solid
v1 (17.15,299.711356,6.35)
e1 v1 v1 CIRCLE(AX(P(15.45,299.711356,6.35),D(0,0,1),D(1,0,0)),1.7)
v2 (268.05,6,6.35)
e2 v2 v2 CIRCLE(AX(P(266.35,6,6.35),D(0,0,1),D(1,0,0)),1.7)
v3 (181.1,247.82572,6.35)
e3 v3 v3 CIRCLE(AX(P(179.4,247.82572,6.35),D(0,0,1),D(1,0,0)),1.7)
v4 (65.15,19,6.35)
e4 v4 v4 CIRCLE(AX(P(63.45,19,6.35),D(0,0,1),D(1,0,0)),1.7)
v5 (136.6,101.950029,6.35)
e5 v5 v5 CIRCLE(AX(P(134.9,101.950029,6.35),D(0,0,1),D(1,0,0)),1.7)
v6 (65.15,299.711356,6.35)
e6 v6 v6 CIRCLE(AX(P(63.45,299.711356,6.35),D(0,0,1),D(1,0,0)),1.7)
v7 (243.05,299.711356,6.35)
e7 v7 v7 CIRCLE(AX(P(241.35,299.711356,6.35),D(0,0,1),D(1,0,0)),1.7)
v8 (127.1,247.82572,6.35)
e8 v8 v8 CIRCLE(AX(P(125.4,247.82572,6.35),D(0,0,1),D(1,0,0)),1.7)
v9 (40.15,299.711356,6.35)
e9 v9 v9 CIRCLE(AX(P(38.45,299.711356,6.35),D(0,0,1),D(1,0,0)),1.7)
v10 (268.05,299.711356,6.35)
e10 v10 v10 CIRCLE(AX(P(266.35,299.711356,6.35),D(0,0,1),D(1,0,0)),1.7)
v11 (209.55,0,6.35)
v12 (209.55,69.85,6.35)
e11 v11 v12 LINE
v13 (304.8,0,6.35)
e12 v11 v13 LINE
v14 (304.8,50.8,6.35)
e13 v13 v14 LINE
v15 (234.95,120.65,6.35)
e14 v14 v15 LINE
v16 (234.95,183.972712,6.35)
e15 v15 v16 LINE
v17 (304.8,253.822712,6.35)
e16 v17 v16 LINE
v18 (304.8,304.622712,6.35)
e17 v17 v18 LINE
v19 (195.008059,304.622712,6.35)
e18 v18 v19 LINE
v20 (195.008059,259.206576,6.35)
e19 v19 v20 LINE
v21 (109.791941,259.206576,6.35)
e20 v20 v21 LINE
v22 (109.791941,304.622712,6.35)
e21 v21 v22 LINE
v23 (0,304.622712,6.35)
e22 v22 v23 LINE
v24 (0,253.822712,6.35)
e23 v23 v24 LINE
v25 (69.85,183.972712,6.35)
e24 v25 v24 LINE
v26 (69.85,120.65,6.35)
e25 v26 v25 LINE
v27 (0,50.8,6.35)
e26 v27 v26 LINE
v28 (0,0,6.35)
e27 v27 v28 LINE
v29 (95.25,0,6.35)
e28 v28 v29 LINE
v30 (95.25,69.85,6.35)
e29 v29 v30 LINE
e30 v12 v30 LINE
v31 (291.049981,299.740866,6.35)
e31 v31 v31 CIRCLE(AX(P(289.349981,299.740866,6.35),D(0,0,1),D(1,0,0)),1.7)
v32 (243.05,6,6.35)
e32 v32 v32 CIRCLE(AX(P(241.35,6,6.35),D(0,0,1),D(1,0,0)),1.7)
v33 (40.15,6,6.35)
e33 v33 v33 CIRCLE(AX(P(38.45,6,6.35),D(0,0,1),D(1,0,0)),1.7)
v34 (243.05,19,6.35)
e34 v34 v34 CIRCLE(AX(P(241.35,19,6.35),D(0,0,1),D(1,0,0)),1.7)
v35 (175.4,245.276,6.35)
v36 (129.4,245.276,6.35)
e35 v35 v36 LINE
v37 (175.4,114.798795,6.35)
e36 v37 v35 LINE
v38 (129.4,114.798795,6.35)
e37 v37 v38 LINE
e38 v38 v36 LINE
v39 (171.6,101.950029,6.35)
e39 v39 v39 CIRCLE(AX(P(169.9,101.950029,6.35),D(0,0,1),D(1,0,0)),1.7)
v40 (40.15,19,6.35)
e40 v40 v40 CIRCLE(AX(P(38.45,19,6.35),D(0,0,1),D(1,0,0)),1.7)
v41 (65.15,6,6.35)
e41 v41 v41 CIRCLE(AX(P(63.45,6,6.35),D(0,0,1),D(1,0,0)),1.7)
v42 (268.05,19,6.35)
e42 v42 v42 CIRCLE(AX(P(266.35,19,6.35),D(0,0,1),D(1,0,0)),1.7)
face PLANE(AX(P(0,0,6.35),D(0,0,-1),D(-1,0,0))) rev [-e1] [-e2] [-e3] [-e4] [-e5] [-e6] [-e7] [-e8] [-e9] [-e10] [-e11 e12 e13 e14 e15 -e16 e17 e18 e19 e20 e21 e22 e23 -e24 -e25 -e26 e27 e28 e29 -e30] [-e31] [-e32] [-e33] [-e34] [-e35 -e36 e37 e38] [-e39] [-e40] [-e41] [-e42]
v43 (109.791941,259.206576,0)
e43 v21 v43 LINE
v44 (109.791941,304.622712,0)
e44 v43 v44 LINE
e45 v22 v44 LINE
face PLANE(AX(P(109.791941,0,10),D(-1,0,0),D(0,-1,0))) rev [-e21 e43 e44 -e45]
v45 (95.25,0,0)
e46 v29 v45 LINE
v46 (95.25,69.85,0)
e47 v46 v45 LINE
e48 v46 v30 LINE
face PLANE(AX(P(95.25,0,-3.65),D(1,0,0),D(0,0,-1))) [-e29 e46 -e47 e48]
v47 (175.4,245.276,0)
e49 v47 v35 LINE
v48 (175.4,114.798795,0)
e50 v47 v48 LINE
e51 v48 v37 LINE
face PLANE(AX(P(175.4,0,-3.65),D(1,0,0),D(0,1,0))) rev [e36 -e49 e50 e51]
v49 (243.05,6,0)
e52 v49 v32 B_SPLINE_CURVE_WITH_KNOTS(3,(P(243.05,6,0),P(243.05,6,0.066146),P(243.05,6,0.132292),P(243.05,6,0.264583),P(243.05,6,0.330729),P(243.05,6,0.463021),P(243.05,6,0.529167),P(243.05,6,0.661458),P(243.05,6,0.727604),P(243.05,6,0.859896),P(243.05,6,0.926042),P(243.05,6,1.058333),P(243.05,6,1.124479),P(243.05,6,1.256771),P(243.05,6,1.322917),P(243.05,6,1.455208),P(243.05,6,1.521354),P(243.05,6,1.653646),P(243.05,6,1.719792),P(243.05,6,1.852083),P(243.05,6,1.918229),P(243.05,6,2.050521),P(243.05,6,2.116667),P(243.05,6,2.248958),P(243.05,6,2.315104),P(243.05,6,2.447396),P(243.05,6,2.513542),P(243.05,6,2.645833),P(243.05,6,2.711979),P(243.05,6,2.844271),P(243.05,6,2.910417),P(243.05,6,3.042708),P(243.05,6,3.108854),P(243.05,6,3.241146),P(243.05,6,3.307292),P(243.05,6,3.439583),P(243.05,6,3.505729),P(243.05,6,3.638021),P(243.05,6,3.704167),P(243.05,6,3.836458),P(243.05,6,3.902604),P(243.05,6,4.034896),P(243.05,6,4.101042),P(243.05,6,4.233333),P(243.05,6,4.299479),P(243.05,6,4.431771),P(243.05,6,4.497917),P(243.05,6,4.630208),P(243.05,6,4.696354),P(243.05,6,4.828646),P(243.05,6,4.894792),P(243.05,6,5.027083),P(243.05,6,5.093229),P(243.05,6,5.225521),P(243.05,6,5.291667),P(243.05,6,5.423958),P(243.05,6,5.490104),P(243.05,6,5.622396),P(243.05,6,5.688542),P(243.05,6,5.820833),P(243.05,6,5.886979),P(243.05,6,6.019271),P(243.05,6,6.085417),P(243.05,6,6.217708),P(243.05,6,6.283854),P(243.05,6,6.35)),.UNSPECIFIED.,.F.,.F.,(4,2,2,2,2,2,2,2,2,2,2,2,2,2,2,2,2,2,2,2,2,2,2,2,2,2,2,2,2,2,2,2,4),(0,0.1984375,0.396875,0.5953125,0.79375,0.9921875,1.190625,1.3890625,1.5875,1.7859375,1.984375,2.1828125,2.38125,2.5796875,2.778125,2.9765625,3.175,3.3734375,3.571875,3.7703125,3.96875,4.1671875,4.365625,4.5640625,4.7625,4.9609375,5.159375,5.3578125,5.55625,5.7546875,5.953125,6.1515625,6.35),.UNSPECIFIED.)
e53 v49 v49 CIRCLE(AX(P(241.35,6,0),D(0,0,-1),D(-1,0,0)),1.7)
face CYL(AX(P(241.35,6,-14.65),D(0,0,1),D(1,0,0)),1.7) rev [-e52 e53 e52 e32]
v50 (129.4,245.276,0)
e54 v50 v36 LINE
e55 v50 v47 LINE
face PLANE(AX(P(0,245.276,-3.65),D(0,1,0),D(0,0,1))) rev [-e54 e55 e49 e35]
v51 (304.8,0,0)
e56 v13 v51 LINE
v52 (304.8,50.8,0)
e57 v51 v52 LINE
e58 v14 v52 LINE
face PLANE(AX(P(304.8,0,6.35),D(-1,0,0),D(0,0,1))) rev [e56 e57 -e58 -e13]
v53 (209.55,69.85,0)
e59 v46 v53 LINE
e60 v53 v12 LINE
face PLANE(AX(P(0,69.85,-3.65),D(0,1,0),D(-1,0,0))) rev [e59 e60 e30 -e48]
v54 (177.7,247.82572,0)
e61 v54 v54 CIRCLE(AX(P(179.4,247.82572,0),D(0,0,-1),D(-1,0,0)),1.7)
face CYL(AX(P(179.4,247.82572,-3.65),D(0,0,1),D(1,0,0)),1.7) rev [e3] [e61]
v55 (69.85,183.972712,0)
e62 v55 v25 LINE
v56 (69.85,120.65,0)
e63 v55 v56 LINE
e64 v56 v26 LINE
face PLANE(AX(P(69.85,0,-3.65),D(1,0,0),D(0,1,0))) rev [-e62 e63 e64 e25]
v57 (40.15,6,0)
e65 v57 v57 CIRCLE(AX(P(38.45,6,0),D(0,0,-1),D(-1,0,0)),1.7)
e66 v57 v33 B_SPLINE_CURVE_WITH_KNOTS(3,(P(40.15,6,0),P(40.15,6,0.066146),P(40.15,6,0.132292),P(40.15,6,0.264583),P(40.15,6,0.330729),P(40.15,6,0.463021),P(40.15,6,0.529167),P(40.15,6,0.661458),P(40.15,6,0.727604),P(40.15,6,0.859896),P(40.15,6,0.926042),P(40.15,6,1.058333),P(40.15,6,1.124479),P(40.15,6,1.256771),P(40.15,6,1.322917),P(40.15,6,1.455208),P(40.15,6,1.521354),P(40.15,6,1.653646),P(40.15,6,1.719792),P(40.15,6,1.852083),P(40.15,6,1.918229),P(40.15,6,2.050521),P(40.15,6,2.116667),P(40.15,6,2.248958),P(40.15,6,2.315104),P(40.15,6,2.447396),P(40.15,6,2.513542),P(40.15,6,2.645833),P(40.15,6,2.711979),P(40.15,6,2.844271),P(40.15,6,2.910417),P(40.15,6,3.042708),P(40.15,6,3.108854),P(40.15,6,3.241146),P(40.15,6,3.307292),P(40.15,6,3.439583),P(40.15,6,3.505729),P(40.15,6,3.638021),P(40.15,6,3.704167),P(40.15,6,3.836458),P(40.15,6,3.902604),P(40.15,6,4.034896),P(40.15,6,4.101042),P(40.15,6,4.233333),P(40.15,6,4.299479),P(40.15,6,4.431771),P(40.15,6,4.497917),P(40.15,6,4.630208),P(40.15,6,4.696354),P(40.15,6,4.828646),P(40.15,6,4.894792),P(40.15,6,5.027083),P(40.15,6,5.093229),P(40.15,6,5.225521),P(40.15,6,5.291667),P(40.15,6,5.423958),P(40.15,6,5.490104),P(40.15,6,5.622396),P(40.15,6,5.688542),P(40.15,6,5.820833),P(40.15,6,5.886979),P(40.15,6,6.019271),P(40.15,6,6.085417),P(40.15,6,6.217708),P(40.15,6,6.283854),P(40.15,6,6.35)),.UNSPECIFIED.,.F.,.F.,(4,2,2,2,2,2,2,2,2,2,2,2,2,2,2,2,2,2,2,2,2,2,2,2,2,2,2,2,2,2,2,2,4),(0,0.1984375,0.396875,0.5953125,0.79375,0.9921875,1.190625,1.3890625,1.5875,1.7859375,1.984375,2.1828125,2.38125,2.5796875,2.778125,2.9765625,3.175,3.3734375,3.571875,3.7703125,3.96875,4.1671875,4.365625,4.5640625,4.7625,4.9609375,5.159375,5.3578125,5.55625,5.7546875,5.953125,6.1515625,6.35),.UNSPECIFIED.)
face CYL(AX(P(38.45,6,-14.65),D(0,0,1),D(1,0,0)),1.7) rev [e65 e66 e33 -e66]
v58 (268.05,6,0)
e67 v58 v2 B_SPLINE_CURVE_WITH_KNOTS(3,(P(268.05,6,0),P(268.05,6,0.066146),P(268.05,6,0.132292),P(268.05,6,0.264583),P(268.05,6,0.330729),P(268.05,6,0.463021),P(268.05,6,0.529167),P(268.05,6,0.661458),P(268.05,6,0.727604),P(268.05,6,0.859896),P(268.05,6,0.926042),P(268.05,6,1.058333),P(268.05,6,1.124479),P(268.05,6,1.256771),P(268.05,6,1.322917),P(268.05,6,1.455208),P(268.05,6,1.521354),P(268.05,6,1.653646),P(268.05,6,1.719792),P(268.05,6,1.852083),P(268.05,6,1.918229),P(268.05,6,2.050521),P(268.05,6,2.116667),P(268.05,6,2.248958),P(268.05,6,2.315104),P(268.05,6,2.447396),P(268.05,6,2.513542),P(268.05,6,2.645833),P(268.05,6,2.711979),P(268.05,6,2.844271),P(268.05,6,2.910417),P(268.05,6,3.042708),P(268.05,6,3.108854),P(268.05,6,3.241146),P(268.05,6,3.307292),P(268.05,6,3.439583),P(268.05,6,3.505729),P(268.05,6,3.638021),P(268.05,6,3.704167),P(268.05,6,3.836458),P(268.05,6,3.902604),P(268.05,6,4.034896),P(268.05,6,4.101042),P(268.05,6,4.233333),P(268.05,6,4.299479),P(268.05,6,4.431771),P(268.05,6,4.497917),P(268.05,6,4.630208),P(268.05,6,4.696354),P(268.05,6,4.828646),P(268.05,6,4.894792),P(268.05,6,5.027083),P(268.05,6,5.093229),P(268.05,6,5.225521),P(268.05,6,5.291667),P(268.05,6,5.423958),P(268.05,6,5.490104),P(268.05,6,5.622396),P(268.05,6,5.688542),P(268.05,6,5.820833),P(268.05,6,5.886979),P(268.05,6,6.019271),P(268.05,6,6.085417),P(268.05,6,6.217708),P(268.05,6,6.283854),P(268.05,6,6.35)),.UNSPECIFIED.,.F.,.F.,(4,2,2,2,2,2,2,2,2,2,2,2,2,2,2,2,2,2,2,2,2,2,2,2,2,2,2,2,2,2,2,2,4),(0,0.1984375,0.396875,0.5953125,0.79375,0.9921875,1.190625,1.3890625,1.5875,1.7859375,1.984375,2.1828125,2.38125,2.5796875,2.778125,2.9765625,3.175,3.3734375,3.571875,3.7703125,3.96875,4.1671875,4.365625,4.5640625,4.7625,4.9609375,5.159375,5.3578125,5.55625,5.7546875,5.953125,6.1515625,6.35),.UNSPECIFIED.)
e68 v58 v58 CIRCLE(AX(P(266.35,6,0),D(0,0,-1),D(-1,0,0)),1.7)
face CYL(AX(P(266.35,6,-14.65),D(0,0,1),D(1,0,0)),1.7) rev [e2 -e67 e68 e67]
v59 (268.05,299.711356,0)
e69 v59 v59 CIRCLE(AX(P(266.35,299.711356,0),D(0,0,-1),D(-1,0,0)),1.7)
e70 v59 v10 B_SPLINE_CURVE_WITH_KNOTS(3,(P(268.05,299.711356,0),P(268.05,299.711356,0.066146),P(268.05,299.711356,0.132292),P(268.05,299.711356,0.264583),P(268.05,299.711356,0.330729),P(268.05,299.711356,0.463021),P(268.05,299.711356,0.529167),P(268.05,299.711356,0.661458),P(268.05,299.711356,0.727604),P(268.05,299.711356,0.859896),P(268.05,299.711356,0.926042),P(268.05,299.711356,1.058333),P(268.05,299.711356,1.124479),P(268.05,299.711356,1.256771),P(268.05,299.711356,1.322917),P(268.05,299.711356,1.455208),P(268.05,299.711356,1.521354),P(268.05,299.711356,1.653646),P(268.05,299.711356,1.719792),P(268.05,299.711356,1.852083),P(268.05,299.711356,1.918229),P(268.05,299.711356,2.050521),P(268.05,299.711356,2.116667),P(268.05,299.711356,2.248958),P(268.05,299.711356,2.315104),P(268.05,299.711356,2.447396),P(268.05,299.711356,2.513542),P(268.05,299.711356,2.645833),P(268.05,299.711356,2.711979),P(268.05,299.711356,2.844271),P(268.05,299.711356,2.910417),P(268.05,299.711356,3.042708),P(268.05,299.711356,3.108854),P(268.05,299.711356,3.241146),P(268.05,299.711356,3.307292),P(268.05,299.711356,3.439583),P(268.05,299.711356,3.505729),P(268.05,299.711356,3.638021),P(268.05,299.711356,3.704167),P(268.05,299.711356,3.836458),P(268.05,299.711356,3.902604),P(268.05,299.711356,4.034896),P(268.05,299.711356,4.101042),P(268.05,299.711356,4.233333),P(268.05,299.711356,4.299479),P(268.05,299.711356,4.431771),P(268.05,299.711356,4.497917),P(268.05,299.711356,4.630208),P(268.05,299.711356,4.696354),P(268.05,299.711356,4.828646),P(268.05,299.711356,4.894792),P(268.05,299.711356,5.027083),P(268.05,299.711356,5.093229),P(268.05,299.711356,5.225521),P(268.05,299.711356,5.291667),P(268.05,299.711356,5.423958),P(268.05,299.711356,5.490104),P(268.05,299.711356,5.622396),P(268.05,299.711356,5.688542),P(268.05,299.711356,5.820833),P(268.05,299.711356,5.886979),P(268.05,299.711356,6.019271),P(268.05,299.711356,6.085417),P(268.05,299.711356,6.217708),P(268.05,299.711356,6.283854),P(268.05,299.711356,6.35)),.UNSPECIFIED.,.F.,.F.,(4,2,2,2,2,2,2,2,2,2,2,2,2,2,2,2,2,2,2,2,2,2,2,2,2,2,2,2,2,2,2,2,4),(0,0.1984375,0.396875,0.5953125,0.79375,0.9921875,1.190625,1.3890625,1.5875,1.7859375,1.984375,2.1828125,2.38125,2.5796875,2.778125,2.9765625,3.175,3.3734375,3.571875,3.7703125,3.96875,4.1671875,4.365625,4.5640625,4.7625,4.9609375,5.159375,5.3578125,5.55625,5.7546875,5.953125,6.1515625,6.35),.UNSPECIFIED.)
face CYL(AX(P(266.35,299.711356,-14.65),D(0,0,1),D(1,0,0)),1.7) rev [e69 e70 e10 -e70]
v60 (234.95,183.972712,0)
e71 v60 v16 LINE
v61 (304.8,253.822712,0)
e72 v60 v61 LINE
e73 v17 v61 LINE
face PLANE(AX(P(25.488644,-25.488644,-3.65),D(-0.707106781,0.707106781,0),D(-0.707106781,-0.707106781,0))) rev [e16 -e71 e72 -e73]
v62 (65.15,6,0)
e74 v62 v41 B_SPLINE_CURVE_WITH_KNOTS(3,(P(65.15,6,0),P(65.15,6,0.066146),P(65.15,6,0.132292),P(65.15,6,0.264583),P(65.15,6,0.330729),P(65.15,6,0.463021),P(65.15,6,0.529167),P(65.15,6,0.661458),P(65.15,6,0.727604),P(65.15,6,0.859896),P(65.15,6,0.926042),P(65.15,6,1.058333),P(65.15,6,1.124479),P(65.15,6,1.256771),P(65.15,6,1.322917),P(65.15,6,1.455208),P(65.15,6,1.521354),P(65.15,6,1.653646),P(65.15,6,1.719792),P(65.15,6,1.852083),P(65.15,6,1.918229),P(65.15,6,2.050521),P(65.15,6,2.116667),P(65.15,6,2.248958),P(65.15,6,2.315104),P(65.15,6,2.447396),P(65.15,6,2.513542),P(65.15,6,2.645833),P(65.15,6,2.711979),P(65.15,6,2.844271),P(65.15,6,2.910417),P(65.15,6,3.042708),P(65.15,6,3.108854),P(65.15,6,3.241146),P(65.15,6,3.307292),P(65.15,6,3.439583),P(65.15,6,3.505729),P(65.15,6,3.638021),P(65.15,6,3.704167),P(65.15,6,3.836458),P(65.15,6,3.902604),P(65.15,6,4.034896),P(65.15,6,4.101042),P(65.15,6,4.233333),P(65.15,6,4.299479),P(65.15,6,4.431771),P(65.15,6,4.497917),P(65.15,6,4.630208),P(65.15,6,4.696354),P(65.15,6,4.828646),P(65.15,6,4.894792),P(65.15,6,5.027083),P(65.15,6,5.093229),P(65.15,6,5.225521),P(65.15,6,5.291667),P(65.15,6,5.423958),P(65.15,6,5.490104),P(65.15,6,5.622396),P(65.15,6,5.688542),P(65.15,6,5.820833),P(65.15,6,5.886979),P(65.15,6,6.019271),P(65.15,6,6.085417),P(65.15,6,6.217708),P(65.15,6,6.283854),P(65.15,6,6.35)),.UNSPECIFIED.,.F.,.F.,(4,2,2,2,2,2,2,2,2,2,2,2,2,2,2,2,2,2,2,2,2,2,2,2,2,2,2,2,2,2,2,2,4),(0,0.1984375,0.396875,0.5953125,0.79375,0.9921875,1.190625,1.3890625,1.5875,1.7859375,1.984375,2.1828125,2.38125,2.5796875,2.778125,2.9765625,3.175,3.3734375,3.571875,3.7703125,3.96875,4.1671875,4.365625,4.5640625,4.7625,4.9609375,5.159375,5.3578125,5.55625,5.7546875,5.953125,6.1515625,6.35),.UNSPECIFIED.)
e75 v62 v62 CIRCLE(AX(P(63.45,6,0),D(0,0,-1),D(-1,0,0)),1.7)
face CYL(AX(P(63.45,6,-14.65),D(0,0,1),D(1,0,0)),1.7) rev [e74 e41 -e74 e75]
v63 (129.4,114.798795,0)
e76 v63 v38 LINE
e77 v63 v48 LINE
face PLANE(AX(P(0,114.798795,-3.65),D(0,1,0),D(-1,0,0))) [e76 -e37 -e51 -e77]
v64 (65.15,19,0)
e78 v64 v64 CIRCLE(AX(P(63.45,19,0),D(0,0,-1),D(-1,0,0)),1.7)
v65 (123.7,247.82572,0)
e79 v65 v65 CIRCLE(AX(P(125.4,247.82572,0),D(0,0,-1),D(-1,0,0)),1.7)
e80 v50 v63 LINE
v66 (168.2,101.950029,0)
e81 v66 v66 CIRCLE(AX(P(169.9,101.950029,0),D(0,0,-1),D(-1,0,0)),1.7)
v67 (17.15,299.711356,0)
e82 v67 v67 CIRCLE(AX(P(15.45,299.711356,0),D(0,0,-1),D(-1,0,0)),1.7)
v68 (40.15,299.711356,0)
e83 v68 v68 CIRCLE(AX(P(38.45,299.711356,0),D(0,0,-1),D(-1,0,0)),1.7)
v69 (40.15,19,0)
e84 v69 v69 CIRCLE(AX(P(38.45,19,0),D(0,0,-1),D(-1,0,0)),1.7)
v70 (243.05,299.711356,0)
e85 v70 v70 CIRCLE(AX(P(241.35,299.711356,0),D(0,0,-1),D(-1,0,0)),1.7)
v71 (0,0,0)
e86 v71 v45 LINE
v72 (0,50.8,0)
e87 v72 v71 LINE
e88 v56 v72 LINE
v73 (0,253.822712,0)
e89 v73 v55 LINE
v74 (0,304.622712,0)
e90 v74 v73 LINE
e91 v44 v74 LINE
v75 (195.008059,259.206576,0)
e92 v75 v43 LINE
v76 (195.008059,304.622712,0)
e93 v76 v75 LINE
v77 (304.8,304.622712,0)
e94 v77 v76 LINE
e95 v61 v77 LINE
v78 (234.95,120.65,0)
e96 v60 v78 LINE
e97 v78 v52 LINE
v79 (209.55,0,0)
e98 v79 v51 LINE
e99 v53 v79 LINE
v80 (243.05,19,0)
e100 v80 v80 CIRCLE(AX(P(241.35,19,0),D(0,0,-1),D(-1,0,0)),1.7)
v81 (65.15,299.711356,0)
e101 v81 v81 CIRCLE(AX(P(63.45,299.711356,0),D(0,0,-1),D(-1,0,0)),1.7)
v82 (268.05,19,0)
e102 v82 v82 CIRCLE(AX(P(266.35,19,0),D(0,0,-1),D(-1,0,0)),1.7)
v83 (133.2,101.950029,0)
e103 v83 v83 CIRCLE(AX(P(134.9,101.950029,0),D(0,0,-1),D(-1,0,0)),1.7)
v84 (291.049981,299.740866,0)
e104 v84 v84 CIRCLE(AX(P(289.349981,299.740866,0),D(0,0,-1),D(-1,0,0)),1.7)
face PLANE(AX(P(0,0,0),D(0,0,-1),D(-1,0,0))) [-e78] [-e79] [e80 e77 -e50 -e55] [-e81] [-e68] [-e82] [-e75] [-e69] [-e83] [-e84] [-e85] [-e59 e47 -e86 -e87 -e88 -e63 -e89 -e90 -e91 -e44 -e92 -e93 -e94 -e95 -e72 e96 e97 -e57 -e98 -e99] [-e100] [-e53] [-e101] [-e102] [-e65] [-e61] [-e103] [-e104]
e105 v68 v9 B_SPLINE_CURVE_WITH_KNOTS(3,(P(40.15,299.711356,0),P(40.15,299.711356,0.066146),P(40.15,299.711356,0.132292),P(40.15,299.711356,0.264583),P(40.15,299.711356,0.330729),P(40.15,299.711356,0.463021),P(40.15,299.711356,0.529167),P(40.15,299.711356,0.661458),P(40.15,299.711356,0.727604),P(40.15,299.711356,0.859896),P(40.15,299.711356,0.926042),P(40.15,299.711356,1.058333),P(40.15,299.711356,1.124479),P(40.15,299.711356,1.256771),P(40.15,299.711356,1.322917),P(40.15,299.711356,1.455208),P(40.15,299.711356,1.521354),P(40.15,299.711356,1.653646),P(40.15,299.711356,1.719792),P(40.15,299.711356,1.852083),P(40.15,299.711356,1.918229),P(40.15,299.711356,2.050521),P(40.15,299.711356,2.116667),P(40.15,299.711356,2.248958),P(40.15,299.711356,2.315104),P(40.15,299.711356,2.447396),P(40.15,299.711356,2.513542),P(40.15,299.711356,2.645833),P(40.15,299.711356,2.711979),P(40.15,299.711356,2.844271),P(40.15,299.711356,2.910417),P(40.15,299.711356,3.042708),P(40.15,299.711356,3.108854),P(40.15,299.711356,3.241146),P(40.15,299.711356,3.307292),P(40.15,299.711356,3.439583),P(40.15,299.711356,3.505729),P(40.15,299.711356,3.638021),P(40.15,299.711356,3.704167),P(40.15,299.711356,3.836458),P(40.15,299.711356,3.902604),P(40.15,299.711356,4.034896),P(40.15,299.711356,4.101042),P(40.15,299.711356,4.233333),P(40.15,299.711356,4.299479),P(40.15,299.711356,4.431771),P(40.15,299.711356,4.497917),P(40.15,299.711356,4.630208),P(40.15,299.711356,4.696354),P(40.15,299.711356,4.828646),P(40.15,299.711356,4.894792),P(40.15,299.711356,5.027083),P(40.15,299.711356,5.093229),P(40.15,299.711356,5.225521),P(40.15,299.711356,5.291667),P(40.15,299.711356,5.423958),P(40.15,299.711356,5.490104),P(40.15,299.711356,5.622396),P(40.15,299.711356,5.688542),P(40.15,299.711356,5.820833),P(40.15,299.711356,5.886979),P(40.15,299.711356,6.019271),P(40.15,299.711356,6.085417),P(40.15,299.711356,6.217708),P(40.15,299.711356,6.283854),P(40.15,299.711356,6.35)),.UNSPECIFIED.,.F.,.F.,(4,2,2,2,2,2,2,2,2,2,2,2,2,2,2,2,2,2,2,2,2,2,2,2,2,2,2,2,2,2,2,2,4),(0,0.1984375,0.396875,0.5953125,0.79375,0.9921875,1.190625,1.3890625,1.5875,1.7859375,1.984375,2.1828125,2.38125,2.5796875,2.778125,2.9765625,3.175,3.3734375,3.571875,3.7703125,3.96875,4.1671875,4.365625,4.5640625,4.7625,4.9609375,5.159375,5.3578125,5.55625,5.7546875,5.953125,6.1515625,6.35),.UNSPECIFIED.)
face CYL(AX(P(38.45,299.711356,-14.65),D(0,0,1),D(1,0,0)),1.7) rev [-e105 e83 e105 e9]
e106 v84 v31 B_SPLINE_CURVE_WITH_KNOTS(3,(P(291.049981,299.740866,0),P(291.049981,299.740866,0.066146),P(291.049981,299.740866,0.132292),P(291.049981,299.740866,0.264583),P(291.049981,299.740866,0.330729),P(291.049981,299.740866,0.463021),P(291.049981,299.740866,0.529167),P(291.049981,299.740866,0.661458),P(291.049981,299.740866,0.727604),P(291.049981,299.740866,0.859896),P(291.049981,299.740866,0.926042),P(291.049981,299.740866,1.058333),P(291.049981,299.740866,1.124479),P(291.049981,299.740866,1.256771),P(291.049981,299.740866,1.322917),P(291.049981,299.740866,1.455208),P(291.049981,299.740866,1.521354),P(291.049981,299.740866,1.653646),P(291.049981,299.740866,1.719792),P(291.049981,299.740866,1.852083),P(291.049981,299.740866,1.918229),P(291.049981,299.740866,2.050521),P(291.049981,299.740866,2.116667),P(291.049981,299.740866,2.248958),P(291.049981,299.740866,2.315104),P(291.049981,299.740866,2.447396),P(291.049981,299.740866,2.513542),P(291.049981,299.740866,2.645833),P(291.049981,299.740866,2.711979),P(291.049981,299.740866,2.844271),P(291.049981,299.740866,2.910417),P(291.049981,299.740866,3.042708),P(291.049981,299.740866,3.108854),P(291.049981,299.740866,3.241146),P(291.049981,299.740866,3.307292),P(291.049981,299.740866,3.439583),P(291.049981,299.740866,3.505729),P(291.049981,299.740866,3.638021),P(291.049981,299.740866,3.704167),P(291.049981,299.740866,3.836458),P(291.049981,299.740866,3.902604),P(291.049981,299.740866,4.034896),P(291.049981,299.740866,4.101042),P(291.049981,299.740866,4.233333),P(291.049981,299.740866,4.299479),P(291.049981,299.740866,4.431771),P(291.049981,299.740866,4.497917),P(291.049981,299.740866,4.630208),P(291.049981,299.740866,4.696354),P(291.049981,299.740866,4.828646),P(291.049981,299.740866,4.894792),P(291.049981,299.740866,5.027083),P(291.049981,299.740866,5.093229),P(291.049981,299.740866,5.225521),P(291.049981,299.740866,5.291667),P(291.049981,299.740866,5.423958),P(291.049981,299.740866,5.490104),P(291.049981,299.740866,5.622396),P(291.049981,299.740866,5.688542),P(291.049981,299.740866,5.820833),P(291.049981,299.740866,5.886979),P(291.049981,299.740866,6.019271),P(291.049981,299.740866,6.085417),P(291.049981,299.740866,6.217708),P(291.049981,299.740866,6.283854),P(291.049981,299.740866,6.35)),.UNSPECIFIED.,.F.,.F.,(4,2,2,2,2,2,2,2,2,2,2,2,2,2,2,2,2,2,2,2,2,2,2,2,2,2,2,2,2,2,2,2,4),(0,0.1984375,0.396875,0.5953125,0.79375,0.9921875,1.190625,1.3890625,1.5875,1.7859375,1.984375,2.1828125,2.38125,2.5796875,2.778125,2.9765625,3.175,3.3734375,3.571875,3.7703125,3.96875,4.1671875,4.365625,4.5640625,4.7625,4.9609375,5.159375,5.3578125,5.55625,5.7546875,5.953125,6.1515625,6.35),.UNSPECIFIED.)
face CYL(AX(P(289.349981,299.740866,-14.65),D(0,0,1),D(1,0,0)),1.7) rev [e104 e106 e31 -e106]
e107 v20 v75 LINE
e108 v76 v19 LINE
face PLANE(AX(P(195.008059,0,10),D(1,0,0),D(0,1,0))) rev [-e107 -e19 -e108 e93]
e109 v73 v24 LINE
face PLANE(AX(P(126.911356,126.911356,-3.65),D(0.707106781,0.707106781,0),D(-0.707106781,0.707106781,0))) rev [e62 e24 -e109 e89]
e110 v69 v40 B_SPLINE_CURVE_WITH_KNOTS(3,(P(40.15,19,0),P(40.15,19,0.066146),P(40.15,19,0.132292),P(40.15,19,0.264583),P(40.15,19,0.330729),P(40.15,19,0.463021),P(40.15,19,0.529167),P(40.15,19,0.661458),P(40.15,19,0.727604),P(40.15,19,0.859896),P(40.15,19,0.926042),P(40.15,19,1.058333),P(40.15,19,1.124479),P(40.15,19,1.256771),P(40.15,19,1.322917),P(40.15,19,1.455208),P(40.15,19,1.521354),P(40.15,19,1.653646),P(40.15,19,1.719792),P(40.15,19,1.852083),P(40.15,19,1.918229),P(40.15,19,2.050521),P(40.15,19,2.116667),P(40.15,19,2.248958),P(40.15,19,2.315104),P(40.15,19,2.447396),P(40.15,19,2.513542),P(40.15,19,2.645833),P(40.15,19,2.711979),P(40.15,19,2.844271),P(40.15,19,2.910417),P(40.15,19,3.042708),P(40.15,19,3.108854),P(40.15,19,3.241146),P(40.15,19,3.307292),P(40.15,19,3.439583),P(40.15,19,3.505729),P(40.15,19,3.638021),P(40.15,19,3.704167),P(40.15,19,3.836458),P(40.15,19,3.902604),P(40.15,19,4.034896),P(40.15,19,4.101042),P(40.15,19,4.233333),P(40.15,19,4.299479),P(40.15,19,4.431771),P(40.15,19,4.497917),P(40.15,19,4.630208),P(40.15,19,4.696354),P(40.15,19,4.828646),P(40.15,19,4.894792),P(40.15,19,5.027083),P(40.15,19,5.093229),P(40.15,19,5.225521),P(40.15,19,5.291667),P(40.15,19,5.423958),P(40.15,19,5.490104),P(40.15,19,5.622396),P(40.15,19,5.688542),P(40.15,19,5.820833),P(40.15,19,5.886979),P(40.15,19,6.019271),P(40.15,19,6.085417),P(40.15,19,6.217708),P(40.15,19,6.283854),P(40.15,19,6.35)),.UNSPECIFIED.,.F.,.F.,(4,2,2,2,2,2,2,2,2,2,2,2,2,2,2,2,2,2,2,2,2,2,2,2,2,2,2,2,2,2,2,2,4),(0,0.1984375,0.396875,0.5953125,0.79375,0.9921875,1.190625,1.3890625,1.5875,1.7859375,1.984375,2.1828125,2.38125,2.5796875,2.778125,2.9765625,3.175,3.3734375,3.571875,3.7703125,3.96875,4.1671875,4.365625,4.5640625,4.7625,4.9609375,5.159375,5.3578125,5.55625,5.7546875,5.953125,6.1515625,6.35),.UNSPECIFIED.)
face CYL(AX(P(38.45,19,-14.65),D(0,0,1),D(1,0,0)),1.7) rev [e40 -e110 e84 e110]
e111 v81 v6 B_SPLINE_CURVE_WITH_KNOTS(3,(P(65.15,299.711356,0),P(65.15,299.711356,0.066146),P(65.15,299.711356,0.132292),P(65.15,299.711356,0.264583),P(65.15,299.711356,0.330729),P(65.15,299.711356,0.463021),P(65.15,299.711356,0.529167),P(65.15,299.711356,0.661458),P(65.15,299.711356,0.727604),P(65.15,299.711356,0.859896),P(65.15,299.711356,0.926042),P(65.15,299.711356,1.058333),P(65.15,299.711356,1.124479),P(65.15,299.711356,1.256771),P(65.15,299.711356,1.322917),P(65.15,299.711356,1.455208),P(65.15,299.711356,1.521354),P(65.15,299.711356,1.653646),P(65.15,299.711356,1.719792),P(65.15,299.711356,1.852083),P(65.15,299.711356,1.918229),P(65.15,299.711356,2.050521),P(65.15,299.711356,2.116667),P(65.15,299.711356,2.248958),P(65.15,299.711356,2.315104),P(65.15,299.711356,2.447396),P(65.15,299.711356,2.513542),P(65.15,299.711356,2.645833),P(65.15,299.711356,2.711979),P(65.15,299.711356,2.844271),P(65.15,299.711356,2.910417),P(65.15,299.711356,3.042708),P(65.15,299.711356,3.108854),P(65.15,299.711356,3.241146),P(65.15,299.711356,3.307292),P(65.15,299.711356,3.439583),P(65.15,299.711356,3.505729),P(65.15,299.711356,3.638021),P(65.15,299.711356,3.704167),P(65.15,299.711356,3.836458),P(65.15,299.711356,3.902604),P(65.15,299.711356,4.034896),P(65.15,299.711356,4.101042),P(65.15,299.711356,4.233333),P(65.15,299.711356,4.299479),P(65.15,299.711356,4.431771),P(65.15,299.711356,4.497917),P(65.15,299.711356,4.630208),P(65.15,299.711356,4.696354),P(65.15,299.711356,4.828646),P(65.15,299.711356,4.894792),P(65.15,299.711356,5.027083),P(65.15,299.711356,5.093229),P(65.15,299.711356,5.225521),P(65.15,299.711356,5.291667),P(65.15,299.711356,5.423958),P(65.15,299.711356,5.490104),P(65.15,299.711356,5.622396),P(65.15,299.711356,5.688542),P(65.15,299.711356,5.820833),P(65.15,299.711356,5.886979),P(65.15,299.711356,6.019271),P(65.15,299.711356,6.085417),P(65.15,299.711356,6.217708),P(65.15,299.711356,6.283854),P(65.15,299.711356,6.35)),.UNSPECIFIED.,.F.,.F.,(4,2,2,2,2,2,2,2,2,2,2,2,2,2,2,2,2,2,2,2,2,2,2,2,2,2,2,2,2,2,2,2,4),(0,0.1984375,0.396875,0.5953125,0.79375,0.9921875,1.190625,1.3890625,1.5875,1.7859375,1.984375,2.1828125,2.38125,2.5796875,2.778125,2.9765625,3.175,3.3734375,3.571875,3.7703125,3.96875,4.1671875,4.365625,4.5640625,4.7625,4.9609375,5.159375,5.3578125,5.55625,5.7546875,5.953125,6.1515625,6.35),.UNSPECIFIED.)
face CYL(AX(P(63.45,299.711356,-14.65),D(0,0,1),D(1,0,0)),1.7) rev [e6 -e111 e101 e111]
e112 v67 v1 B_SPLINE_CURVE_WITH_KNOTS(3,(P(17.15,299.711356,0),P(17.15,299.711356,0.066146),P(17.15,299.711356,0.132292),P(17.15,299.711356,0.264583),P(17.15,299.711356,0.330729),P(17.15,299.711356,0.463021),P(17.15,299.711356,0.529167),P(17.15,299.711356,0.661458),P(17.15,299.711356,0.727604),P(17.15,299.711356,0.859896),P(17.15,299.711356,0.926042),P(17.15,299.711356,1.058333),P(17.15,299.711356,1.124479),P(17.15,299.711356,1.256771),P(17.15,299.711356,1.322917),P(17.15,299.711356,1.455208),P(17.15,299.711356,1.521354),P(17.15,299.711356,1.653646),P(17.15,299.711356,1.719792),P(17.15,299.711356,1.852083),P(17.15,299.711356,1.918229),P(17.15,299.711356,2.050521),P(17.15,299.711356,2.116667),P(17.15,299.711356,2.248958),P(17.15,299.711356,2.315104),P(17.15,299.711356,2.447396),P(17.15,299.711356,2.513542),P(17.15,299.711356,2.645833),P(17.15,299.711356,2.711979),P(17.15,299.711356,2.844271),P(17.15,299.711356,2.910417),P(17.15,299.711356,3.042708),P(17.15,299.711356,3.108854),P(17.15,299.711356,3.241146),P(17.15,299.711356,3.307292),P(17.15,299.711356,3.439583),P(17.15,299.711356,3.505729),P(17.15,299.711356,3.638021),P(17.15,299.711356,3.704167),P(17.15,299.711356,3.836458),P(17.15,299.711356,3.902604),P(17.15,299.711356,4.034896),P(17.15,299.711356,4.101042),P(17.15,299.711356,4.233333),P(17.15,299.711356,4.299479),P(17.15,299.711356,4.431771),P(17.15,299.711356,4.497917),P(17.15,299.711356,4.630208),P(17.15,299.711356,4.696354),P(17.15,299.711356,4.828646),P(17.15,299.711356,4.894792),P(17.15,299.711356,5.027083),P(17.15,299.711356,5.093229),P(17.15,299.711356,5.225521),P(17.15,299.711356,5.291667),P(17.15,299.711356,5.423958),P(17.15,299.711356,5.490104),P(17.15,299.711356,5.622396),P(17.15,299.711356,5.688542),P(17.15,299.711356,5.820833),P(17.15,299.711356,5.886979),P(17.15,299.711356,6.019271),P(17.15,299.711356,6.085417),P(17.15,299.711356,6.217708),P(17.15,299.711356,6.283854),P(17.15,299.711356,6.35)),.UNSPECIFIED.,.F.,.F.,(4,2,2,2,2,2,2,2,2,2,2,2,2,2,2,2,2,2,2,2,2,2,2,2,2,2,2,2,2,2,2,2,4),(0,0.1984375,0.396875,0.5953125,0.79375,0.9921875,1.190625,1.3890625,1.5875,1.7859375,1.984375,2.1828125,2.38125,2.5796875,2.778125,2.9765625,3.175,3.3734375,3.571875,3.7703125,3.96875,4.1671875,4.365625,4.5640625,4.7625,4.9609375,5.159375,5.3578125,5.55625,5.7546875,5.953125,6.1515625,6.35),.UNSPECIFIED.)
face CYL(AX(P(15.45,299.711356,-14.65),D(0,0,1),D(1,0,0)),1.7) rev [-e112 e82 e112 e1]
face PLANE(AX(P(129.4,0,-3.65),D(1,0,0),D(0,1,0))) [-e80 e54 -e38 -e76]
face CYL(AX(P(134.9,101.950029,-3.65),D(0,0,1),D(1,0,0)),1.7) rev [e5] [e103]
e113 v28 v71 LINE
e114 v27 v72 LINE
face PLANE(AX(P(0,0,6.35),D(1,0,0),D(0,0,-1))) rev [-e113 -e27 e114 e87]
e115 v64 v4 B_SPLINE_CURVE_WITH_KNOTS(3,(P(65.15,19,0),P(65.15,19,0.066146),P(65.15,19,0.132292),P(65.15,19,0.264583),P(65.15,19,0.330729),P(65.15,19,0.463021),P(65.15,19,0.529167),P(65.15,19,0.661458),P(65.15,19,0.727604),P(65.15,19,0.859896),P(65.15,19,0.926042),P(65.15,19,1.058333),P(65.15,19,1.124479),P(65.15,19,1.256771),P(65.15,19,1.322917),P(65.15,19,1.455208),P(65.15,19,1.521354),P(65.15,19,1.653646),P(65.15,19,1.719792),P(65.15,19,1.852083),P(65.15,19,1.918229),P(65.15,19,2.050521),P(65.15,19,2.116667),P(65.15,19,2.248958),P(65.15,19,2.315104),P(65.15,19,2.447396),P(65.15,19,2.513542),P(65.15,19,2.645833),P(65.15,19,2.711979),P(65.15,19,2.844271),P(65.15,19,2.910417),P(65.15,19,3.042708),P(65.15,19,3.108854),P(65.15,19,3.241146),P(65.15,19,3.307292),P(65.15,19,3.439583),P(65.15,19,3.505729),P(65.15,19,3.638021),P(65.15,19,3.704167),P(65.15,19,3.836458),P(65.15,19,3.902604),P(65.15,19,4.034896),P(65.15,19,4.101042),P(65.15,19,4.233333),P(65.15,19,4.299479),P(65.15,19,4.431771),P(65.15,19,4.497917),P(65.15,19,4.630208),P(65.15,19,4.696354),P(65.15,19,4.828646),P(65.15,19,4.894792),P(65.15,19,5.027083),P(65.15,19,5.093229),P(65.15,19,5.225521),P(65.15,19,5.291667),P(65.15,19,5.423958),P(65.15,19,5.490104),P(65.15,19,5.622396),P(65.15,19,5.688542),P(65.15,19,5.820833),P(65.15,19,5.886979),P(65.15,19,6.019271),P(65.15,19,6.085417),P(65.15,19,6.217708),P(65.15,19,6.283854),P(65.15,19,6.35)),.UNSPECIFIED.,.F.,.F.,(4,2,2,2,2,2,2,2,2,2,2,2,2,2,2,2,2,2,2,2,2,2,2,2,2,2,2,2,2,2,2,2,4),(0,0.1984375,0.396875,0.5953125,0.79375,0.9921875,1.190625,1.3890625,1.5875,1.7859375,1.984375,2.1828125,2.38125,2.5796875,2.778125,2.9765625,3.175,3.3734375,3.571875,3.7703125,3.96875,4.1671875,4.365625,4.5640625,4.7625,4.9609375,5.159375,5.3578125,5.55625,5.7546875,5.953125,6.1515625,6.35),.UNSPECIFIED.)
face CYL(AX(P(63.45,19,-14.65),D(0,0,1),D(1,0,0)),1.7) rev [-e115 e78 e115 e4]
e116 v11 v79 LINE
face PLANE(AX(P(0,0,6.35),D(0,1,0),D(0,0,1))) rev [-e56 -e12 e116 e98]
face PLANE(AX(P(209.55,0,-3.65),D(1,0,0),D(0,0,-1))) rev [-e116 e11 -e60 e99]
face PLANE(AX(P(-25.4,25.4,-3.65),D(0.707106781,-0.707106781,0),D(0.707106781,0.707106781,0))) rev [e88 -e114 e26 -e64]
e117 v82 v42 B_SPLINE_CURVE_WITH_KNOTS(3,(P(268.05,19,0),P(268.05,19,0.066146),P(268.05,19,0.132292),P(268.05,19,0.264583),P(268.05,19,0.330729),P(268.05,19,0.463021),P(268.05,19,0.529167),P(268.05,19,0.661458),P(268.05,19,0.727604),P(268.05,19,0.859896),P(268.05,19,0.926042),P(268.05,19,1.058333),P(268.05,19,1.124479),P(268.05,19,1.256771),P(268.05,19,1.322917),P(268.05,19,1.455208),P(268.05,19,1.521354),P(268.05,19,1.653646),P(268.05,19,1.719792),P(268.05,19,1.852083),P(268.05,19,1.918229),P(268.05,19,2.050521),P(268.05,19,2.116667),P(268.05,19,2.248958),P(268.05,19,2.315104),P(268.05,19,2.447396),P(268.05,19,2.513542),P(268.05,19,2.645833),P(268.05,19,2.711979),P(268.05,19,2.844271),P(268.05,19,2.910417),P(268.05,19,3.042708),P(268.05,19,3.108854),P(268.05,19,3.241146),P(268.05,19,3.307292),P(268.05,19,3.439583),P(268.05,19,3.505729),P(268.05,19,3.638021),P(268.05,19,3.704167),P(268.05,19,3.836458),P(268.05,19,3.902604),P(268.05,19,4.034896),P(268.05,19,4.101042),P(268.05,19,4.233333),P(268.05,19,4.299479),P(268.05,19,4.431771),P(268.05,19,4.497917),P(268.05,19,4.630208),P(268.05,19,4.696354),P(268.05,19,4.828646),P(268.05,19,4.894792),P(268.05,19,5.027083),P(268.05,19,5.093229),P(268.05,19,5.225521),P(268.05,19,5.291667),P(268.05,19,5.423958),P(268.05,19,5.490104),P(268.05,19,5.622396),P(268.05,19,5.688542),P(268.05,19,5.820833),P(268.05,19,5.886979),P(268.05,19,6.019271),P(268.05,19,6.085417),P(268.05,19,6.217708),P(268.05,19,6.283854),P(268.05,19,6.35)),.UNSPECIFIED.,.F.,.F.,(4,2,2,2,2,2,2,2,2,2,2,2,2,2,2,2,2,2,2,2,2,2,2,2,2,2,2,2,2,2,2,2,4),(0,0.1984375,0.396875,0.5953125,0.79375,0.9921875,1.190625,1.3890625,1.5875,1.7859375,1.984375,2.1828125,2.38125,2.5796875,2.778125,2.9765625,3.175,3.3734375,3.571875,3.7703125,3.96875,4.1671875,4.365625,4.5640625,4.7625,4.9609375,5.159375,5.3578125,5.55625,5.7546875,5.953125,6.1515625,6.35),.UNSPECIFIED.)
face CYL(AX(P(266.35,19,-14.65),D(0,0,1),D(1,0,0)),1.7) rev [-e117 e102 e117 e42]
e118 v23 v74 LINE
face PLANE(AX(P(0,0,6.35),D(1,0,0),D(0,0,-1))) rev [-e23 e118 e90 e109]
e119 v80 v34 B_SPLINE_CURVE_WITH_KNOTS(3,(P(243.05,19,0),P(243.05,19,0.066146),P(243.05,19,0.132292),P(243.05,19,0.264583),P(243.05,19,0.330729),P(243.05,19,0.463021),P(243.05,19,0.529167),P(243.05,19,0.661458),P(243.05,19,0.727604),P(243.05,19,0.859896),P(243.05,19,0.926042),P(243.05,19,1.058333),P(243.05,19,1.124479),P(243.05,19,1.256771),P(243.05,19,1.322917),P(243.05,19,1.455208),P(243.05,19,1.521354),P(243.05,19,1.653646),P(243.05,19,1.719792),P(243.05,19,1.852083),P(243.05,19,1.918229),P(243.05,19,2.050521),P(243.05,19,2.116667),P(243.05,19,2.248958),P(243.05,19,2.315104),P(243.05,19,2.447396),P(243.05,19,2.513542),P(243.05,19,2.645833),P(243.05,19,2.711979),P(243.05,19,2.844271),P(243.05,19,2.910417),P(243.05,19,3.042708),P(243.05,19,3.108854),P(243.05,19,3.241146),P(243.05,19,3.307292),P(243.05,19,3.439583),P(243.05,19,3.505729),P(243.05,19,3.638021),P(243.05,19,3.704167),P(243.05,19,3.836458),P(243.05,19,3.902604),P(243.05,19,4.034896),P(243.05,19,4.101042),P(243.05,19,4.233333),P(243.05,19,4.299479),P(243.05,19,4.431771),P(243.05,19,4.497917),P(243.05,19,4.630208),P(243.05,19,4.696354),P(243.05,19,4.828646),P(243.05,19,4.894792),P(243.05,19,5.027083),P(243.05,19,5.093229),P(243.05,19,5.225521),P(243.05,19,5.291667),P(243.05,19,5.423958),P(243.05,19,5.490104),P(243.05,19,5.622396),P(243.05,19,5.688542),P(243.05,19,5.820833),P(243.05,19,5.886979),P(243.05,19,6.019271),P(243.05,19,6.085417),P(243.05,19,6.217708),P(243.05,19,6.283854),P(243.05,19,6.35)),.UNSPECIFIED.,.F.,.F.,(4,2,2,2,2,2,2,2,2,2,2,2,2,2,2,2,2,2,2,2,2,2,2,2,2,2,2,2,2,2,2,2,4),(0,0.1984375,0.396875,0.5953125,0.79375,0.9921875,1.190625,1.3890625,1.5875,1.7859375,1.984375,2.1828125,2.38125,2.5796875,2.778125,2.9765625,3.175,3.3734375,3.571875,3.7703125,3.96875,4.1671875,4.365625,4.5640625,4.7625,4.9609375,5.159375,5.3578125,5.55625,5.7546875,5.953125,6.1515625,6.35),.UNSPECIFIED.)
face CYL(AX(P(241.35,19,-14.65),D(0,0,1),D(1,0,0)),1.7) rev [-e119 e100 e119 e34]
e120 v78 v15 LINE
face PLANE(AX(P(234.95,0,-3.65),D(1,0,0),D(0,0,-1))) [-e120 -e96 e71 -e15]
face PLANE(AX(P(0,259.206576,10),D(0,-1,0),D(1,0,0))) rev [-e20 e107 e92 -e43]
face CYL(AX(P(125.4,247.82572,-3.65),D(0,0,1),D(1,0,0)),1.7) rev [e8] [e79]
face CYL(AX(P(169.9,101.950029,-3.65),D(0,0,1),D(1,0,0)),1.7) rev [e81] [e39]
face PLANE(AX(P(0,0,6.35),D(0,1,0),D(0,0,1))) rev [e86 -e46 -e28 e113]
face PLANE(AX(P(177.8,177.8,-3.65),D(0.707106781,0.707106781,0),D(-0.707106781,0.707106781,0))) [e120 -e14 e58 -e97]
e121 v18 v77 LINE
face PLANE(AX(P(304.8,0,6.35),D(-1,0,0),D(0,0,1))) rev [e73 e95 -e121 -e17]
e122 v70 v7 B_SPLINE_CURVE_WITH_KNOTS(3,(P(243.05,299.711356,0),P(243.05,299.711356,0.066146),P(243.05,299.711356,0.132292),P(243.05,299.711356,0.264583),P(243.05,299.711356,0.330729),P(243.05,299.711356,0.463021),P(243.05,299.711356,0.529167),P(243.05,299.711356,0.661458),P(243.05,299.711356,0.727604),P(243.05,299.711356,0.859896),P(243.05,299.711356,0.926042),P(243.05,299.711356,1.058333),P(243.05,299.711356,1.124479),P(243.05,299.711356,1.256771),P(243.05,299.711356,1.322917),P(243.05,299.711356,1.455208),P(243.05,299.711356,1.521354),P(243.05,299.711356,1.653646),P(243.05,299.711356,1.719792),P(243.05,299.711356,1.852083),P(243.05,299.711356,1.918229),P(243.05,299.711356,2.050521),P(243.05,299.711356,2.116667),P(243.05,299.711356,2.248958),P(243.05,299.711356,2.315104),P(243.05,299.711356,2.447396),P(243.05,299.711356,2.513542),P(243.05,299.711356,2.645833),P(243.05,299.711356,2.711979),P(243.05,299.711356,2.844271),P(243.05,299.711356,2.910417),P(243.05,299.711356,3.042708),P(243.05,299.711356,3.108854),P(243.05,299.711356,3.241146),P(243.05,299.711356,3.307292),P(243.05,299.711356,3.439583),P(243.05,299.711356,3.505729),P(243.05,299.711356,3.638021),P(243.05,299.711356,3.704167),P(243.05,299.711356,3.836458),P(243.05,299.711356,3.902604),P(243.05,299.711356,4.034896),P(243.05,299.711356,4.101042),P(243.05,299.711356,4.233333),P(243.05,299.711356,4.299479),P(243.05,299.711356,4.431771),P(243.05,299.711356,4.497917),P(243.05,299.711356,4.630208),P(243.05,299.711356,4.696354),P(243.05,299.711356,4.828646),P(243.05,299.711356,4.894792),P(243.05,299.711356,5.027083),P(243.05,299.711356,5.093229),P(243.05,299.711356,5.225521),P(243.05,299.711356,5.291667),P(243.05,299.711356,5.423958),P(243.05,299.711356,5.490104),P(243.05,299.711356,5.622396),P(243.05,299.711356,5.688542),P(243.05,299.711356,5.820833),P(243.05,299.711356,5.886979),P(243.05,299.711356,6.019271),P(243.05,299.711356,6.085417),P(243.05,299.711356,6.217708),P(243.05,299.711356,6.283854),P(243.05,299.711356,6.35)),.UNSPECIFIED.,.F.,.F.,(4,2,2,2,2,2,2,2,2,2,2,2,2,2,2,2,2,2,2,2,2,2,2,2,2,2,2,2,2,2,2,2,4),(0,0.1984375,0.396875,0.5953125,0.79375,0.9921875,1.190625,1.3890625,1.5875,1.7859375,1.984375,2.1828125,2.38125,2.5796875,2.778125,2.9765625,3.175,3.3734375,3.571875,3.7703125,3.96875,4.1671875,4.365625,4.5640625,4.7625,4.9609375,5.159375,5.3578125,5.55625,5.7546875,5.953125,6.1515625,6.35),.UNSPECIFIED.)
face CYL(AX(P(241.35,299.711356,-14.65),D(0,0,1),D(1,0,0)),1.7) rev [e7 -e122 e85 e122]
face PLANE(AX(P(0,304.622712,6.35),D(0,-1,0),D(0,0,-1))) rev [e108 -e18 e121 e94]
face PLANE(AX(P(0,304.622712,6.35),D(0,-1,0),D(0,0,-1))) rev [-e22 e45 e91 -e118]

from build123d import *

# Parameters (mm, degrees)
SKETCH1_W              = 304.8
SKETCH1_H              = 304.622712027
BOSS_EXTRUDE1_DEPTH    = 6.35
CUT_EXTRUDE1_START     = -6.35
CUT_EXTRUDE1_OUTLINE_R = 1.7
CUT_EXTRUDE1_OUTLINE_W = 46
CUT_EXTRUDE1_OUTLINE_H = 130.477204634
CUT_EXTRUDE1_DEPTH     = 6.35
SKETCH4_W              = 85.216118386
SKETCH4_H              = 49.623018197
CUT_EXTRUDE2_DEPTH     = 10
SKETCH5_R              = 1.7
CUT_EXTRUDE3_DEPTH     = 21
SKETCH6_R              = 1.7
CUT_EXTRUDE4_DEPTH     = 21
SKETCH7_W              = 114.3
SKETCH7_H              = 69.85
CUT_EXTRUDE5_DEPTH     = 10


# Read off the part's stored shape, not the designer's step: Cut-Extrude1
with BuildPart() as part:
    # Sketch1 → Boss-Extrude1 (new body)
    with BuildSketch(Plane.XY):
        with Locations((152.4, 152.311356014)):
            Rectangle(SKETCH1_W, SKETCH1_H)
    extrude(amount=BOSS_EXTRUDE1_DEPTH)

    # Cut-Extrude1 outline → Cut-Extrude1 (cut)
    with BuildSketch(Plane.XY.offset(6.35).offset(CUT_EXTRUDE1_START)):
        with Locations((169.9, 101.950028876)):
            Circle(CUT_EXTRUDE1_OUTLINE_R)
        with Locations((152.4, 180.037397769)):
            Rectangle(CUT_EXTRUDE1_OUTLINE_W, CUT_EXTRUDE1_OUTLINE_H)
        with Locations((125.4, 247.82572008)):
            Circle(CUT_EXTRUDE1_OUTLINE_R)
        with Locations((179.4, 247.82572008)):
            Circle(CUT_EXTRUDE1_OUTLINE_R)
        with Locations((134.9, 101.950028876)):
            Circle(CUT_EXTRUDE1_OUTLINE_R)
    extrude(amount=CUT_EXTRUDE1_DEPTH, mode=Mode.SUBTRACT)

    # Sketch4 → Cut-Extrude2 (cut)
    with BuildSketch(Plane(origin=(0, 0, 0), x_dir=(-1, 0, 0), z_dir=(0, 0, -1))):
        with Locations((-152.4, 284.018084638)):
            Rectangle(SKETCH4_W, SKETCH4_H)
    extrude(amount=-CUT_EXTRUDE2_DEPTH, mode=Mode.SUBTRACT)

    # Sketch5 → Cut-Extrude3 (cut)
    with BuildSketch(Plane.XY.offset(6.35)):
        with Locations((241.35, 299.711356013)):
            Circle(SKETCH5_R)
        with Locations((266.35, 299.711356013)):
            Circle(SKETCH5_R)
        with Locations((38.45, 299.711356013)):
            Circle(SKETCH5_R)
        with Locations((63.45, 299.711356013)):
            Circle(SKETCH5_R)
        with Locations((241.35, 19.000000001)):
            Circle(SKETCH5_R)
        with Locations((241.35, 6.000000001)):
            Circle(SKETCH5_R)
        with Locations((266.35, 19.000000001)):
            Circle(SKETCH5_R)
        with Locations((266.35, 6.000000001)):
            Circle(SKETCH5_R)
        with Locations((63.45, 6)):
            Circle(SKETCH5_R)
        with Locations((38.45, 6)):
            Circle(SKETCH5_R)
        with Locations((63.45, 19)):
            Circle(SKETCH5_R)
        with Locations((38.45, 19)):
            Circle(SKETCH5_R)
    extrude(amount=-CUT_EXTRUDE3_DEPTH, mode=Mode.SUBTRACT)

    # Sketch6 → Cut-Extrude4 (cut)
    with BuildSketch(Plane.XY.offset(6.35)):
        with Locations((289.349981069, 299.740865879)):
            Circle(SKETCH6_R)
        with Locations((15.45, 299.711356012)):
            Circle(SKETCH6_R)
    extrude(amount=-CUT_EXTRUDE4_DEPTH, mode=Mode.SUBTRACT)

    # Sketch7 → Cut-Extrude5 (cut)
    with BuildSketch(Plane.XY.offset(6.35)):
        Polygon((0, 253.822712027), (0, 50.8), (69.85, 120.65), (69.85, 183.972712027), align=None)
        with Locations((152.4, 34.925)):
            Rectangle(SKETCH7_W, SKETCH7_H)
        Polygon((234.95, 120.65), (304.8, 50.8), (304.8, 253.822712027), (234.95, 183.972712027), align=None)
    extrude(amount=-CUT_EXTRUDE5_DEPTH, mode=Mode.SUBTRACT)


solid = part.part
